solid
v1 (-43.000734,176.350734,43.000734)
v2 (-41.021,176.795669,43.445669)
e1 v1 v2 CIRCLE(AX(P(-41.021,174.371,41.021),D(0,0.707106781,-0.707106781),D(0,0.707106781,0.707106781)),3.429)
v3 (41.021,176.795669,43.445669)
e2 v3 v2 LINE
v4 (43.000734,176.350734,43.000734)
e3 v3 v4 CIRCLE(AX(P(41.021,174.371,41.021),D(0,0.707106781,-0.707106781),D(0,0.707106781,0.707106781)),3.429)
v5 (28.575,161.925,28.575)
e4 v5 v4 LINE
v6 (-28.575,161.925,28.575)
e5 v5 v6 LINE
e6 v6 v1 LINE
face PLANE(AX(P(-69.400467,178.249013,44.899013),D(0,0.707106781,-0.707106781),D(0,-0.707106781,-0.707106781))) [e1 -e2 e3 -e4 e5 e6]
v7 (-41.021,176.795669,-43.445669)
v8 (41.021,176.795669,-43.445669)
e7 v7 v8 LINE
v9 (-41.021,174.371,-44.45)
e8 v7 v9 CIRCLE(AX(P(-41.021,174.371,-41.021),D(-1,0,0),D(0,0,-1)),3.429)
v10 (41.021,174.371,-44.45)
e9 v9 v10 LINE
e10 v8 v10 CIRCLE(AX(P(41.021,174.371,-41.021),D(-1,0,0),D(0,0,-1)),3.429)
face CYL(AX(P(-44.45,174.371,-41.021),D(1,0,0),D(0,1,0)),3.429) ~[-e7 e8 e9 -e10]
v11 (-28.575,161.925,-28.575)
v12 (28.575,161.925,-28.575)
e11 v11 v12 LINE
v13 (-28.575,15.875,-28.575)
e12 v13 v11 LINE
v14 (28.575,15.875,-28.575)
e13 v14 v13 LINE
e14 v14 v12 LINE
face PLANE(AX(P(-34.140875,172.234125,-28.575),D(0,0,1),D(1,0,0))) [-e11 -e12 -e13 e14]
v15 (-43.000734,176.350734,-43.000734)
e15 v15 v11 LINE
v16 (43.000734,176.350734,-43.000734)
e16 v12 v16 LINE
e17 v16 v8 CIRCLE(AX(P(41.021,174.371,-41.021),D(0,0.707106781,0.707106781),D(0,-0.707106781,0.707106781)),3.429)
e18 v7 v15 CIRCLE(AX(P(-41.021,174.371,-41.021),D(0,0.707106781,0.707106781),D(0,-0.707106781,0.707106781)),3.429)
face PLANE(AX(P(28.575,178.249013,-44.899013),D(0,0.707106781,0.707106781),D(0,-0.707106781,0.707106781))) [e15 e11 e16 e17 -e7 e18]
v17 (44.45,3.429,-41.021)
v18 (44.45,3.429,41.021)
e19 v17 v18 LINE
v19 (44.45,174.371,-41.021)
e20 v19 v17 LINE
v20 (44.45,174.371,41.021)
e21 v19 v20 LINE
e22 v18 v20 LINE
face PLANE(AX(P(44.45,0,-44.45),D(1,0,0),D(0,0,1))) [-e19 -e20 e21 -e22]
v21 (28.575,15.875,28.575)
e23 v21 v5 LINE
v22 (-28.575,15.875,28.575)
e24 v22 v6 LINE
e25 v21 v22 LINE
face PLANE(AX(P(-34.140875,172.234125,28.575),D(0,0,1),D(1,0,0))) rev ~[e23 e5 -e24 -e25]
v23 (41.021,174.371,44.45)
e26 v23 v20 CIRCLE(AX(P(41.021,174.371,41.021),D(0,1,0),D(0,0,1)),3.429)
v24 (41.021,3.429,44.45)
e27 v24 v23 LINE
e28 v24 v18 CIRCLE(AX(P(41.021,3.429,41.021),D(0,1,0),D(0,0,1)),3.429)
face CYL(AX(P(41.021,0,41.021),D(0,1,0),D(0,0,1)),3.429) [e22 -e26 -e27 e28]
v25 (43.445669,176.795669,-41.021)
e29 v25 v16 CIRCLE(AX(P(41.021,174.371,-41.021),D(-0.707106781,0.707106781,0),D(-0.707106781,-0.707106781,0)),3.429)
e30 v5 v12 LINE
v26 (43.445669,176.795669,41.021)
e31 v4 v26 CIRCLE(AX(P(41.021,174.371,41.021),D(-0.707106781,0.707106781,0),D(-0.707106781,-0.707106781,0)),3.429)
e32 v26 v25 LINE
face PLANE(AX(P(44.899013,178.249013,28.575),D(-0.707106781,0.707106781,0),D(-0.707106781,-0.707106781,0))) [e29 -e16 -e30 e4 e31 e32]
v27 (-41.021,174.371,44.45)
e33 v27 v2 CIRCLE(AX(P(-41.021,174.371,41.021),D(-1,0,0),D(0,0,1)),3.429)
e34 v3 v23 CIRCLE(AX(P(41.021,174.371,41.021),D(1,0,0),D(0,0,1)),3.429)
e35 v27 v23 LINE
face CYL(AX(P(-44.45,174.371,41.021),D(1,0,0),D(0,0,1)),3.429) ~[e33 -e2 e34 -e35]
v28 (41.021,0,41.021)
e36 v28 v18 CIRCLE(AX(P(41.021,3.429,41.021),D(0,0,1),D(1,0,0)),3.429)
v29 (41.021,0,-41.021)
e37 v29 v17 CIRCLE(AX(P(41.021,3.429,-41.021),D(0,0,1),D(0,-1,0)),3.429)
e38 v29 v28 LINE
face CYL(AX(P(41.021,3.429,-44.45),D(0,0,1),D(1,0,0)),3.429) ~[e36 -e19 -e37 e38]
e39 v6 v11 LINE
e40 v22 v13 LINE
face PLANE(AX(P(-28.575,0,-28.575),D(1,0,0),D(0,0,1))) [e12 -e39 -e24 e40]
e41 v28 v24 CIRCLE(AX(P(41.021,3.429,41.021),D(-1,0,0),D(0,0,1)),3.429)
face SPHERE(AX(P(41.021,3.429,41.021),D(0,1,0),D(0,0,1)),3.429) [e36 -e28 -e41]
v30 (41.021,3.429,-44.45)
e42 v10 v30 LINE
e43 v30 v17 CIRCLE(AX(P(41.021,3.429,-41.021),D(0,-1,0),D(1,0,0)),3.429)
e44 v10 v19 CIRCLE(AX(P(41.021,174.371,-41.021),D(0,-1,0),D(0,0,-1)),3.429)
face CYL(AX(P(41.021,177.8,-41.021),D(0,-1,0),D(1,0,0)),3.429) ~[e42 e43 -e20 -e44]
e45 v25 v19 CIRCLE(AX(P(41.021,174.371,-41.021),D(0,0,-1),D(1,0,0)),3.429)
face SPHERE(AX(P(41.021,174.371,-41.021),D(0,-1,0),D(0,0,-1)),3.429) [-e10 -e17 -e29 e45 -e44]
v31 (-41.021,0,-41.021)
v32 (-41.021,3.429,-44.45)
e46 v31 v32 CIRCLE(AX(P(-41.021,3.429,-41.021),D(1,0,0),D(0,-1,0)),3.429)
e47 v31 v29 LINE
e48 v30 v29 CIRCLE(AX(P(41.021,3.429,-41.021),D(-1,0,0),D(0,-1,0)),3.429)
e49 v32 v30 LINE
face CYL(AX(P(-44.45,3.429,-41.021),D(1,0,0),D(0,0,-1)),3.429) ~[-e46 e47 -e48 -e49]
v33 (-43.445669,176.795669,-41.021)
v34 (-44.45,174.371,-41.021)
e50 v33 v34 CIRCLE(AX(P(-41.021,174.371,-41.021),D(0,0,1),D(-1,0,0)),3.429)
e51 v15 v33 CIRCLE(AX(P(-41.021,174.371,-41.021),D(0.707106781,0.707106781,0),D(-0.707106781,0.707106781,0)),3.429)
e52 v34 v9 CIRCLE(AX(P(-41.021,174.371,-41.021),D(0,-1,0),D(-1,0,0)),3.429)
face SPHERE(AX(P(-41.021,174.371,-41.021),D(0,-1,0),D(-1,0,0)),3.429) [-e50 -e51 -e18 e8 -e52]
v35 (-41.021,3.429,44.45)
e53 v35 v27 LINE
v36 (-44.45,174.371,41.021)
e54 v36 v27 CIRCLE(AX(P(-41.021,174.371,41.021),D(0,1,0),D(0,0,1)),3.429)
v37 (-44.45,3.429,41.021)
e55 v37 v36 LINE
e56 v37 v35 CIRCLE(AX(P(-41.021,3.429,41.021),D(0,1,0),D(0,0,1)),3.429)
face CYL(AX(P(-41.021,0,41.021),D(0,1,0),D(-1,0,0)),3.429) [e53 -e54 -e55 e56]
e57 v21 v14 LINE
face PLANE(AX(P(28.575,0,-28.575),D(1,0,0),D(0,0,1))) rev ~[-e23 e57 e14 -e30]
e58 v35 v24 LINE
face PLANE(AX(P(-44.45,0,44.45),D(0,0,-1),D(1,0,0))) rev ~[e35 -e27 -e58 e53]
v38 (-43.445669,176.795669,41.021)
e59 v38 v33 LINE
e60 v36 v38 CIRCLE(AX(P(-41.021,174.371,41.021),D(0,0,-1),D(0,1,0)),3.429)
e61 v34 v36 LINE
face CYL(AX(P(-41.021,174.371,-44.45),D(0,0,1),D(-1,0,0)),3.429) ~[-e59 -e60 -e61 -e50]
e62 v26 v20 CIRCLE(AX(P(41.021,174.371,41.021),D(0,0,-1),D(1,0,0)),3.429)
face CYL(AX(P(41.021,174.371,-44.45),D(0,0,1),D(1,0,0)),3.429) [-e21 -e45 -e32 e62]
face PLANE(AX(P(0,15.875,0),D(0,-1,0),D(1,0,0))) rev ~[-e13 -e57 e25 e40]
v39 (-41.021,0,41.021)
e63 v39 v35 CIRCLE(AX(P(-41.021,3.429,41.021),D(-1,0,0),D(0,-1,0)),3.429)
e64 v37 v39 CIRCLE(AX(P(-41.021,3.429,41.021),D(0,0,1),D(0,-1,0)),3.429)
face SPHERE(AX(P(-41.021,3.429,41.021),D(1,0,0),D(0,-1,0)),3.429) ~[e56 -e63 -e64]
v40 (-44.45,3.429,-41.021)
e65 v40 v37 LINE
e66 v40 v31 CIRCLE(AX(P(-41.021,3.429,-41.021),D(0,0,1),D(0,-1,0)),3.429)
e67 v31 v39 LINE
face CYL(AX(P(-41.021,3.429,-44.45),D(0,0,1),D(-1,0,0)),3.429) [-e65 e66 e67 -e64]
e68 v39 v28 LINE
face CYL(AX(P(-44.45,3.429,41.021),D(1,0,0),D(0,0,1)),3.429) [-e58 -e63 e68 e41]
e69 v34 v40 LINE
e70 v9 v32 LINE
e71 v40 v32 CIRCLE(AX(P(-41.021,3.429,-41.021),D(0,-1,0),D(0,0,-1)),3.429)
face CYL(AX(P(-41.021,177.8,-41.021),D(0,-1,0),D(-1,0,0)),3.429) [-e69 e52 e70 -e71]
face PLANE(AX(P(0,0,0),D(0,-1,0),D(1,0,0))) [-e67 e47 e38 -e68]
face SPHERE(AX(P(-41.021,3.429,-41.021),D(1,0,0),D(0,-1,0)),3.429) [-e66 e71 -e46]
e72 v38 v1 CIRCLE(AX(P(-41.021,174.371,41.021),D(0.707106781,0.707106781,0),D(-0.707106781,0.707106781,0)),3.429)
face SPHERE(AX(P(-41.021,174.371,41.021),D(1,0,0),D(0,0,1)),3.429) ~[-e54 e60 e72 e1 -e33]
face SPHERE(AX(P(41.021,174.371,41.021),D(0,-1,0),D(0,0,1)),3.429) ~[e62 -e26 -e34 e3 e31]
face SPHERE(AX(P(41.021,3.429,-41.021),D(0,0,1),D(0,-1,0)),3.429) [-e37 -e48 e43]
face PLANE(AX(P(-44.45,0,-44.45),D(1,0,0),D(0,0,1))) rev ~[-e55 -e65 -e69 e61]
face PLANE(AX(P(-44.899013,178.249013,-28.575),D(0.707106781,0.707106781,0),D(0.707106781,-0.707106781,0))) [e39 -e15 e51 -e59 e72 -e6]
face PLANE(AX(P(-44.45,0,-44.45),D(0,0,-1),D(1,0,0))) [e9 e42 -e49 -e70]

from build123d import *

# Parameters (mm, degrees)
F0_W         = 88.9
F0_H         = 88.9
F0_W_2       = 57.15
F0_H_2       = 57.15
F1_DEPTH     = 177.8
F2_DEPTH     = 15.875
F3_R         = 3.429
F4_T1_DEPTH  = 57.15
F4_T3_DEPTH  = 57.15
F4_T9_DEPTH  = 97.975467434
F4_T13_DEPTH = 97.975467434
F4_T20_DEPTH = 97.975467434
F4_T24_DEPTH = 97.975467434
F4_T31_DEPTH = 97.975467434
F4_T35_DEPTH = 97.975467434
F4_T42_DEPTH = 97.975467434
F4_T46_DEPTH = 97.975467434


# Not quite as in the source:
# - a fillet or chamfer that OpenCascade refuses, or shapes differently, is made with other operations: its cross-section is extruded or revolved along the edge and cut away or added


with BuildPart() as f1:
    # F0 (on Front) → F1 (new body)
    with BuildSketch(Plane.XZ):
        Rectangle(F0_W, F0_H)
        Rectangle(F0_W_2, F0_H_2, mode=Mode.SUBTRACT)
    extrude(amount=-F1_DEPTH)

    # F0 (on Front) → F2 (join)
    with BuildSketch(Plane.XZ):
        Rectangle(F0_W, F0_H)
        Rectangle(F0_W_2, F0_H_2, mode=Mode.SUBTRACT)
        Rectangle(F0_W_2, F0_H_2)
    extrude(amount=-F2_DEPTH)

    # F3
    f3_edges = [f1.edges().sort_by_distance(p)[0] for p in [
        (44.45, 88.9, 44.45),
        (0, 0, 44.45),
        (44.45, 0, 0),
        (0, 0, -44.45),
        (44.45, 88.9, -44.45),
        (-44.45, 0, 0),
        (-44.45, 88.9, -44.45),
        (0, 177.8, 44.45),
        (-44.45, 88.9, 44.45),
        (-44.45, 177.8, 0),
        (0, 177.8, -44.45),
        (44.45, 177.8, 0),
    ]]
    fillet(f3_edges, radius=F3_R)

    # F4: chamfer of 15.875 on 4 edges, made by hand

    # F4_s2 → F4_t1 (cut)
    with BuildSketch(Plane.XY.offset(-28.575)):
        with BuildLine():
            Line((-44.8990128061, 178.2490128061), (-28.1259871939, 161.4759871939))
            Line((-28.1259871939, 161.4759871939), (-27.8084871939, 161.4759871939))
            ThreePointArc((-27.8084871939, 161.4759871939), (-28.2575, 169.637993597), (-28.2575, 177.8))
            Line((-28.2575, 177.8), (-28.575, 178.1175))
            ThreePointArc((-28.575, 178.1175), (-36.737006403, 178.1175), (-44.8990128061, 178.5665128061))
            Line((-44.8990128061, 178.5665128061), (-44.8990128061, 178.2490128061))
        make_face()
        with BuildLine():
            Line((44.8990128061, 178.2490128061), (28.1259871939, 161.4759871939))
            Line((28.1259871939, 161.4759871939), (27.8084871939, 161.4759871939))
            ThreePointArc((27.8084871939, 161.4759871939), (28.2575, 169.637993597), (28.2575, 177.8))
            Line((28.2575, 177.8), (28.575, 178.1175))
            ThreePointArc((28.575, 178.1175), (36.737006403, 178.1175), (44.8990128061, 178.5665128061))
            Line((44.8990128061, 178.5665128061), (44.8990128061, 178.2490128061))
        make_face()
    extrude(amount=F4_T1_DEPTH, mode=Mode.SUBTRACT)

    # F4_s4 → F4_t3 (cut)
    with BuildSketch(Plane.YZ.offset(-28.575)):
        with BuildLine():
            Line((178.2490128061, -44.8990128061), (161.4759871939, -28.1259871939))
            Line((161.4759871939, -28.1259871939), (161.4759871939, -27.8084871939))
            ThreePointArc((161.4759871939, -27.8084871939), (169.637993597, -28.2575), (177.8, -28.2575))
            Line((177.8, -28.2575), (178.1175, -28.575))
            ThreePointArc((178.1175, -28.575), (178.1175, -36.737006403), (178.5665128061, -44.8990128061))
            Line((178.5665128061, -44.8990128061), (178.2490128061, -44.8990128061))
        make_face()
        with BuildLine():
            Line((178.2490128061, 44.8990128061), (161.4759871939, 28.1259871939))
            Line((161.4759871939, 28.1259871939), (161.4759871939, 27.8084871939))
            ThreePointArc((161.4759871939, 27.8084871939), (169.637993597, 28.2575), (177.8, 28.2575))
            Line((177.8, 28.2575), (178.1175, 28.575))
            ThreePointArc((178.1175, 28.575), (178.1175, 36.737006403), (178.5665128061, 44.8990128061))
            Line((178.5665128061, 44.8990128061), (178.2490128061, 44.8990128061))
        make_face()
    extrude(amount=F4_T3_DEPTH, mode=Mode.SUBTRACT)


with BuildPart() as f4_tool7:
    # F4_s8 → F4_t9 (new body)
    with BuildSketch(Plane.XY.offset(-69.400467434)):
        with BuildLine():
            Line((-44.8990128061, 178.2490128061), (-28.1259871939, 161.4759871939))
            Line((-28.1259871939, 161.4759871939), (-27.8084871939, 161.4759871939))
            ThreePointArc((-27.8084871939, 161.4759871939), (-28.2575, 169.637993597), (-28.2575, 177.8))
            Line((-28.2575, 177.8), (-28.575, 178.1175))
            ThreePointArc((-28.575, 178.1175), (-36.737006403, 178.1175), (-44.8990128061, 178.5665128061))
            Line((-44.8990128061, 178.5665128061), (-44.8990128061, 178.2490128061))
        make_face()
    extrude(amount=F4_T9_DEPTH)

    split(bisect_by=Plane.XY.offset(-28.575), keep=Keep.BOTTOM)


with BuildPart() as f4_tool11:
    # F4_s12 → F4_t13 (new body)
    with BuildSketch(Plane.YZ.offset(28.575)):
        with BuildLine():
            Line((178.2490128061, -44.8990128061), (161.4759871939, -28.1259871939))
            Line((161.4759871939, -28.1259871939), (161.4759871939, -27.8084871939))
            ThreePointArc((161.4759871939, -27.8084871939), (169.637993597, -28.2575), (177.8, -28.2575))
            Line((177.8, -28.2575), (178.1175, -28.575))
            ThreePointArc((178.1175, -28.575), (178.1175, -36.737006403), (178.5665128061, -44.8990128061))
            Line((178.5665128061, -44.8990128061), (178.2490128061, -44.8990128061))
        make_face()
    extrude(amount=-F4_T13_DEPTH)

    split(bisect_by=Plane.YZ.offset(-28.575), keep=Keep.BOTTOM)


with BuildPart() as f4_tool7_1:
    add(f4_tool7.part)

    # F4_t15: intersect F4_tool11
    add(f4_tool11.part, mode=Mode.INTERSECT)


with BuildPart() as f1_1:
    add(f1.part)

    # F4_t5: cut F4_tool7
    add(f4_tool7_1.part, mode=Mode.SUBTRACT)


with BuildPart() as f4_tool18:
    # F4_s19 → F4_t20 (new body)
    with BuildSketch(Plane.XY.offset(-28.575)):
        with BuildLine():
            Line((-44.8990128061, 178.2490128061), (-28.1259871939, 161.4759871939))
            Line((-28.1259871939, 161.4759871939), (-27.8084871939, 161.4759871939))
            ThreePointArc((-27.8084871939, 161.4759871939), (-28.2575, 169.637993597), (-28.2575, 177.8))
            Line((-28.2575, 177.8), (-28.575, 178.1175))
            ThreePointArc((-28.575, 178.1175), (-36.737006403, 178.1175), (-44.8990128061, 178.5665128061))
            Line((-44.8990128061, 178.5665128061), (-44.8990128061, 178.2490128061))
        make_face()
    extrude(amount=F4_T20_DEPTH)

    split(bisect_by=Plane.XY.offset(28.575), keep=Keep.TOP)


with BuildPart() as f4_tool22:
    # F4_s23 → F4_t24 (new body)
    with BuildSketch(Plane.YZ.offset(-69.400467434)):
        with BuildLine():
            Line((178.2490128061, 44.8990128061), (161.4759871939, 28.1259871939))
            Line((161.4759871939, 28.1259871939), (161.4759871939, 27.8084871939))
            ThreePointArc((161.4759871939, 27.8084871939), (169.637993597, 28.2575), (177.8, 28.2575))
            Line((177.8, 28.2575), (178.1175, 28.575))
            ThreePointArc((178.1175, 28.575), (178.1175, 36.737006403), (178.5665128061, 44.8990128061))
            Line((178.5665128061, 44.8990128061), (178.2490128061, 44.8990128061))
        make_face()
    extrude(amount=F4_T24_DEPTH)

    split(bisect_by=Plane.YZ.offset(-28.575), keep=Keep.BOTTOM)


with BuildPart() as f4_tool18_1:
    add(f4_tool18.part)

    # F4_t26: intersect F4_tool22
    add(f4_tool22.part, mode=Mode.INTERSECT)


with BuildPart() as f1_2:
    add(f1_1.part)

    # F4_t16: cut F4_tool18
    add(f4_tool18_1.part, mode=Mode.SUBTRACT)


with BuildPart() as f4_tool29:
    # F4_s30 → F4_t31 (new body)
    with BuildSketch(Plane.XY.offset(28.575)):
        with BuildLine():
            Line((44.8990128061, 178.2490128061), (28.1259871939, 161.4759871939))
            Line((28.1259871939, 161.4759871939), (27.8084871939, 161.4759871939))
            ThreePointArc((27.8084871939, 161.4759871939), (28.2575, 169.637993597), (28.2575, 177.8))
            Line((28.2575, 177.8), (28.575, 178.1175))
            ThreePointArc((28.575, 178.1175), (36.737006403, 178.1175), (44.8990128061, 178.5665128061))
            Line((44.8990128061, 178.5665128061), (44.8990128061, 178.2490128061))
        make_face()
    extrude(amount=-F4_T31_DEPTH)

    split(bisect_by=Plane.XY.offset(-28.575), keep=Keep.BOTTOM)


with BuildPart() as f4_tool33:
    # F4_s34 → F4_t35 (new body)
    with BuildSketch(Plane.YZ.offset(69.400467434)):
        with BuildLine():
            Line((178.2490128061, -44.8990128061), (161.4759871939, -28.1259871939))
            Line((161.4759871939, -28.1259871939), (161.4759871939, -27.8084871939))
            ThreePointArc((161.4759871939, -27.8084871939), (169.637993597, -28.2575), (177.8, -28.2575))
            Line((177.8, -28.2575), (178.1175, -28.575))
            ThreePointArc((178.1175, -28.575), (178.1175, -36.737006403), (178.5665128061, -44.8990128061))
            Line((178.5665128061, -44.8990128061), (178.2490128061, -44.8990128061))
        make_face()
    extrude(amount=-F4_T35_DEPTH)

    split(bisect_by=Plane.YZ.offset(28.575), keep=Keep.TOP)


with BuildPart() as f4_tool29_1:
    add(f4_tool29.part)

    # F4_t37: intersect F4_tool33
    add(f4_tool33.part, mode=Mode.INTERSECT)


with BuildPart() as f1_3:
    add(f1_2.part)

    # F4_t27: cut F4_tool29
    add(f4_tool29_1.part, mode=Mode.SUBTRACT)


with BuildPart() as f4_tool40:
    # F4_s41 → F4_t42 (new body)
    with BuildSketch(Plane.YZ.offset(-28.575)):
        with BuildLine():
            Line((178.2490128061, 44.8990128061), (161.4759871939, 28.1259871939))
            Line((161.4759871939, 28.1259871939), (161.4759871939, 27.8084871939))
            ThreePointArc((161.4759871939, 27.8084871939), (169.637993597, 28.2575), (177.8, 28.2575))
            Line((177.8, 28.2575), (178.1175, 28.575))
            ThreePointArc((178.1175, 28.575), (178.1175, 36.737006403), (178.5665128061, 44.8990128061))
            Line((178.5665128061, 44.8990128061), (178.2490128061, 44.8990128061))
        make_face()
    extrude(amount=F4_T42_DEPTH)

    split(bisect_by=Plane.YZ.offset(28.575), keep=Keep.TOP)


with BuildPart() as f4_tool44:
    # F4_s45 → F4_t46 (new body)
    with BuildSketch(Plane.XY.offset(69.400467434)):
        with BuildLine():
            Line((44.8990128061, 178.2490128061), (28.1259871939, 161.4759871939))
            Line((28.1259871939, 161.4759871939), (27.8084871939, 161.4759871939))
            ThreePointArc((27.8084871939, 161.4759871939), (28.2575, 169.637993597), (28.2575, 177.8))
            Line((28.2575, 177.8), (28.575, 178.1175))
            ThreePointArc((28.575, 178.1175), (36.737006403, 178.1175), (44.8990128061, 178.5665128061))
            Line((44.8990128061, 178.5665128061), (44.8990128061, 178.2490128061))
        make_face()
    extrude(amount=-F4_T46_DEPTH)

    split(bisect_by=Plane.XY.offset(28.575), keep=Keep.TOP)


with BuildPart() as f4_tool40_1:
    add(f4_tool40.part)

    # F4_t48: intersect F4_tool44
    add(f4_tool44.part, mode=Mode.INTERSECT)


with BuildPart() as f1_4:
    add(f1_3.part)

    # F4_t38: cut F4_tool40
    add(f4_tool40_1.part, mode=Mode.SUBTRACT)


solid = f1_4.part
